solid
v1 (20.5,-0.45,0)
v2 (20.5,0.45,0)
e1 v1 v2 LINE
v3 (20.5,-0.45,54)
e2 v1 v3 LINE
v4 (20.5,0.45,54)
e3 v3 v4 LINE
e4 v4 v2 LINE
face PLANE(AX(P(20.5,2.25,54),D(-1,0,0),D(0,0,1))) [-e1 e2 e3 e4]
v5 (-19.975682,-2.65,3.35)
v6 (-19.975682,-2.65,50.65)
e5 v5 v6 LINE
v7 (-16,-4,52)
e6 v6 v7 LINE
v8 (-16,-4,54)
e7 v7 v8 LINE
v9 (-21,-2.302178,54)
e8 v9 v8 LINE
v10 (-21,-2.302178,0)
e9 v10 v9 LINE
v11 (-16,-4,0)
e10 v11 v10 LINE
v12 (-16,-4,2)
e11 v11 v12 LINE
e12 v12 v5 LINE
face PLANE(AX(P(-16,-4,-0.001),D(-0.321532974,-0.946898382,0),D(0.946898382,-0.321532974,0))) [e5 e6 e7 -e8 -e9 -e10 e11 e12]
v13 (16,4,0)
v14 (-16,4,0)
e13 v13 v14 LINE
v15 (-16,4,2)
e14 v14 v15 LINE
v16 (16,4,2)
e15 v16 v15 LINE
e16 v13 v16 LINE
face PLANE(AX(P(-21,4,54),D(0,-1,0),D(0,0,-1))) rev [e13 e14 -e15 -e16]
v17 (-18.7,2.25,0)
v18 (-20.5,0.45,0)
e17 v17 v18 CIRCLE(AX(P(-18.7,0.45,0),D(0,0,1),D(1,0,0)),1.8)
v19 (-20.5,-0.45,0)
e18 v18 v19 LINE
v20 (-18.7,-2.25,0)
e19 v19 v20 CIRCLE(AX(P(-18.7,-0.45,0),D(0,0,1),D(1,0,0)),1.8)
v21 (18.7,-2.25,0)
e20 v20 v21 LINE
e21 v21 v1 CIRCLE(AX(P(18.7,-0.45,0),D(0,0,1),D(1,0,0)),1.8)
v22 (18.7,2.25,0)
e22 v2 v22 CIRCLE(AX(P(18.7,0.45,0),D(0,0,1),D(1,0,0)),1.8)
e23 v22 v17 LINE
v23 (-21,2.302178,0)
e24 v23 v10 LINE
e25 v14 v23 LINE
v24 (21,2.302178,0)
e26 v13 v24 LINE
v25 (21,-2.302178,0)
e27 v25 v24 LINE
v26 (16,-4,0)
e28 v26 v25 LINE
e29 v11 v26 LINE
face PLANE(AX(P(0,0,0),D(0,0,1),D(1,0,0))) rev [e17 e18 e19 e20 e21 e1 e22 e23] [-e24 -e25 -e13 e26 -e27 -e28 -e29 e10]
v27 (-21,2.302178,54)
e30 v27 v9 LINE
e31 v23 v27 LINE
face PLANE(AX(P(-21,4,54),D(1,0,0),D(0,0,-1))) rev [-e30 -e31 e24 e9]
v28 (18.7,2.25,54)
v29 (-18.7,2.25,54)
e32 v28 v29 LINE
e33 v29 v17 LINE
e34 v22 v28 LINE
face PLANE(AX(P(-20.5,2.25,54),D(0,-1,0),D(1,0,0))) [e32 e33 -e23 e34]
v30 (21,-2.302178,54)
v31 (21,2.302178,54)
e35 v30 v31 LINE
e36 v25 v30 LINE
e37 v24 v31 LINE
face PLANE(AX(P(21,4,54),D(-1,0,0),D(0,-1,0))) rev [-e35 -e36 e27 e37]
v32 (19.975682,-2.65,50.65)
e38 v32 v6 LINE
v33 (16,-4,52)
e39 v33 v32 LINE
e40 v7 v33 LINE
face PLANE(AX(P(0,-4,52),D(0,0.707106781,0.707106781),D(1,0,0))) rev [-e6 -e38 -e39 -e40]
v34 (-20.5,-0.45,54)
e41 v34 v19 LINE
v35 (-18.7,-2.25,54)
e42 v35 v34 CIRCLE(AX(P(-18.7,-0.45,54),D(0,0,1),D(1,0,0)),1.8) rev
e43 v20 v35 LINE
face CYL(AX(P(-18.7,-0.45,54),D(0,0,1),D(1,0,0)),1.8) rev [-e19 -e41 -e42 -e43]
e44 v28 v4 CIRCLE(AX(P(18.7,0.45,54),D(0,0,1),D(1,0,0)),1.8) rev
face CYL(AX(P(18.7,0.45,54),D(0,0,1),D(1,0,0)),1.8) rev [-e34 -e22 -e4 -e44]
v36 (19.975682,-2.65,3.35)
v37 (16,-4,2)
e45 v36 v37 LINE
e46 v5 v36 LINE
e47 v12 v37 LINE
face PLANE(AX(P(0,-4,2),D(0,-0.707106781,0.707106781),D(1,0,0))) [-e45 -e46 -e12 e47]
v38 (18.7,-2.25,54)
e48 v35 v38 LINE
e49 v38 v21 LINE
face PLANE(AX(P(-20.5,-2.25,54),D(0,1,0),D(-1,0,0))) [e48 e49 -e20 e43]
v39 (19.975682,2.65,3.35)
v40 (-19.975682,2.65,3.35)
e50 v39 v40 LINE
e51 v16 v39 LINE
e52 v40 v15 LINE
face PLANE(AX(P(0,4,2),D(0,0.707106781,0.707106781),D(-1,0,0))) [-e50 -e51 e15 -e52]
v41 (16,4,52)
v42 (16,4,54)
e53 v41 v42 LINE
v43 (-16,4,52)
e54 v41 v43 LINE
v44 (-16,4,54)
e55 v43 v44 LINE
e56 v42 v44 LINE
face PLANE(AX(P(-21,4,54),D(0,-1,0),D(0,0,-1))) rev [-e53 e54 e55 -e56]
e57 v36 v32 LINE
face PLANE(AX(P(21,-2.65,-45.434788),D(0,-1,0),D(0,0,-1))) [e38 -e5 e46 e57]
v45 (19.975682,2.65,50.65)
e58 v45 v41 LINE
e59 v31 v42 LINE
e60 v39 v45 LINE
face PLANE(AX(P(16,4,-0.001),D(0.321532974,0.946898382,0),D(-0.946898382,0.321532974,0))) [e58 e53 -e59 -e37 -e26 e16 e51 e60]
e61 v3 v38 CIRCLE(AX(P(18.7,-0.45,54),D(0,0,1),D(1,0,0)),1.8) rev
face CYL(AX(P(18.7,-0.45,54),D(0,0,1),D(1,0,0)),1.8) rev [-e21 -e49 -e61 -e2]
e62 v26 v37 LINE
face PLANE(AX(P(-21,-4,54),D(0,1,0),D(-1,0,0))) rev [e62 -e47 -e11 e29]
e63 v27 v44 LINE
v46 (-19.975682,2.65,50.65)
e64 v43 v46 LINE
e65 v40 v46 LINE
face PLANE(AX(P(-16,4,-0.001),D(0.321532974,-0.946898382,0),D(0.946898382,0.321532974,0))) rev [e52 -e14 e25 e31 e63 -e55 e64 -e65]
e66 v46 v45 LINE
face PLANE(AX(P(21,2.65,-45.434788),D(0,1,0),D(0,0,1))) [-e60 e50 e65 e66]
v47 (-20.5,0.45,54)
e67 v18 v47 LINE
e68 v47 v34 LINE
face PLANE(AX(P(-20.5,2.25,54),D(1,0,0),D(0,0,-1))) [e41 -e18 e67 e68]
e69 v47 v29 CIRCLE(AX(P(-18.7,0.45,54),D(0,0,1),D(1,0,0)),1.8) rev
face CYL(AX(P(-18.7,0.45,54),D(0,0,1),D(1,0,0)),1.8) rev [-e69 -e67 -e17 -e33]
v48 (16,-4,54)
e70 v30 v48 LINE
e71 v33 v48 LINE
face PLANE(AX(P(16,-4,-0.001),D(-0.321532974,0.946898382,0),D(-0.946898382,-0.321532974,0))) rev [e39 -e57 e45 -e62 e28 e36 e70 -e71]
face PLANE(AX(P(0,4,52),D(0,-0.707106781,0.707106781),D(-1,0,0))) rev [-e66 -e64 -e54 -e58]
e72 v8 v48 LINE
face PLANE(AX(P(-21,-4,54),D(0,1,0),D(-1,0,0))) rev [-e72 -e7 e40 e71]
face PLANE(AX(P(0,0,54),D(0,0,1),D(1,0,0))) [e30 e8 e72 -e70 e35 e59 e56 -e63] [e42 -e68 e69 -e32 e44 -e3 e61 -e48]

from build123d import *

# Parameters (mm, degrees)
SKETCH1_W            = 42
SKETCH1_H            = 8
SKETCH1_W_2          = 41
SKETCH1_H_2          = 4.5
BOSS_EXTRUDE1_DEPTH  = 54
CUT_EXTRUDE1_REACH   = 60.078
MIRROR2_COPY_1_REACH = 60.078
FILLET1_R            = 1.8
CUT_EXTRUDE2_START   = -2
SKETCH3_OUTSIDE_W    = 57.776
SKETCH3_OUTSIDE_H    = 23.776
SKETCH3_OUTSIDE_W_2  = 42
SKETCH3_OUTSIDE_H_2  = 5.3
CUT_EXTRUDE2_DEPTH   = 50
CHAMFER1_SIZE        = 1.35


with BuildPart() as part:
    # Sketch1 → Boss-Extrude1 (new body)
    with BuildSketch(Plane.XY):
        Rectangle(SKETCH1_W, SKETCH1_H)
        Rectangle(SKETCH1_W_2, SKETCH1_H_2, mode=Mode.SUBTRACT)
    extrude(amount=BOSS_EXTRUDE1_DEPTH)

    # Sketch2 → Cut-Extrude1 (cut, up to next)
    with BuildSketch(Plane.XY.offset(54), mode=Mode.PRIVATE) as cut_extrude1_sk1:
        Polygon((-16, 4), (-21, 2.302178038), (-21, 4), align=None)
    cut_extrude1_tool1 = extrude(cut_extrude1_sk1.sketch, amount=-CUT_EXTRUDE1_REACH, mode=Mode.PRIVATE) & part.part
    cut_extrude1 = cut_extrude1_tool1.solids().sort_by_distance((-19.333333, 3.434059, 54))[0]
    add(cut_extrude1, mode=Mode.SUBTRACT)

    # Mirror1: Cut-Extrude1 across plane
    add(cut_extrude1.mirror(Plane.ZX), mode=Mode.SUBTRACT)

    # Mirror2: Cut-Extrude1 across plane
    add(cut_extrude1.mirror(Plane(origin=(0, 0, 0), x_dir=(0, 0, 1), z_dir=(1, 0, 0))), mode=Mode.SUBTRACT)

    # Mirror2 copy 1 sketch → Mirror2 copy 1 (cut, up to next)
    with BuildSketch(Plane(origin=(0, 0, 54), x_dir=(-1, 0, 0), z_dir=(0, 0, 1)), mode=Mode.PRIVATE) as mirror2_copy_1_sk1:
        Polygon((-16, 4), (-21, 2.302178038), (-21, 4), align=None)
    mirror2_copy_1_tool1 = extrude(mirror2_copy_1_sk1.sketch, amount=-MIRROR2_COPY_1_REACH, mode=Mode.PRIVATE) & part.part
    add(mirror2_copy_1_tool1.solids().sort_by_distance((19.333333, -3.434059, 54))[0], mode=Mode.SUBTRACT)

    # Fillet1
    fillet1_edges = [part.edges().sort_by_distance(p)[0] for p in [
        (-20.5, 2.25, 27),
        (-20.5, -2.25, 27),
        (20.5, -2.25, 27),
        (20.5, 2.25, 27),
    ]]
    fillet(fillet1_edges, radius=FILLET1_R)

    # Sketch3 outside → Cut-Extrude2 (cut)
    with BuildSketch(Plane.XY.offset(54).offset(CUT_EXTRUDE2_START)):
        Rectangle(SKETCH3_OUTSIDE_W, SKETCH3_OUTSIDE_H)
        Rectangle(SKETCH3_OUTSIDE_W_2, SKETCH3_OUTSIDE_H_2, mode=Mode.SUBTRACT)
    extrude(amount=-CUT_EXTRUDE2_DEPTH, mode=Mode.SUBTRACT)

    # Chamfer1
    chamfer1_edges = [part.edges().sort_by_distance(p)[0] for p in [
        (0, -2.65, 2),
        (0, -2.65, 52),
        (0, 2.65, 52),
        (0, 2.65, 2),
    ]]
    chamfer(chamfer1_edges, length=CHAMFER1_SIZE - 0.0001)  # a hair under: the kernel refuses the full size


solid = part.part
